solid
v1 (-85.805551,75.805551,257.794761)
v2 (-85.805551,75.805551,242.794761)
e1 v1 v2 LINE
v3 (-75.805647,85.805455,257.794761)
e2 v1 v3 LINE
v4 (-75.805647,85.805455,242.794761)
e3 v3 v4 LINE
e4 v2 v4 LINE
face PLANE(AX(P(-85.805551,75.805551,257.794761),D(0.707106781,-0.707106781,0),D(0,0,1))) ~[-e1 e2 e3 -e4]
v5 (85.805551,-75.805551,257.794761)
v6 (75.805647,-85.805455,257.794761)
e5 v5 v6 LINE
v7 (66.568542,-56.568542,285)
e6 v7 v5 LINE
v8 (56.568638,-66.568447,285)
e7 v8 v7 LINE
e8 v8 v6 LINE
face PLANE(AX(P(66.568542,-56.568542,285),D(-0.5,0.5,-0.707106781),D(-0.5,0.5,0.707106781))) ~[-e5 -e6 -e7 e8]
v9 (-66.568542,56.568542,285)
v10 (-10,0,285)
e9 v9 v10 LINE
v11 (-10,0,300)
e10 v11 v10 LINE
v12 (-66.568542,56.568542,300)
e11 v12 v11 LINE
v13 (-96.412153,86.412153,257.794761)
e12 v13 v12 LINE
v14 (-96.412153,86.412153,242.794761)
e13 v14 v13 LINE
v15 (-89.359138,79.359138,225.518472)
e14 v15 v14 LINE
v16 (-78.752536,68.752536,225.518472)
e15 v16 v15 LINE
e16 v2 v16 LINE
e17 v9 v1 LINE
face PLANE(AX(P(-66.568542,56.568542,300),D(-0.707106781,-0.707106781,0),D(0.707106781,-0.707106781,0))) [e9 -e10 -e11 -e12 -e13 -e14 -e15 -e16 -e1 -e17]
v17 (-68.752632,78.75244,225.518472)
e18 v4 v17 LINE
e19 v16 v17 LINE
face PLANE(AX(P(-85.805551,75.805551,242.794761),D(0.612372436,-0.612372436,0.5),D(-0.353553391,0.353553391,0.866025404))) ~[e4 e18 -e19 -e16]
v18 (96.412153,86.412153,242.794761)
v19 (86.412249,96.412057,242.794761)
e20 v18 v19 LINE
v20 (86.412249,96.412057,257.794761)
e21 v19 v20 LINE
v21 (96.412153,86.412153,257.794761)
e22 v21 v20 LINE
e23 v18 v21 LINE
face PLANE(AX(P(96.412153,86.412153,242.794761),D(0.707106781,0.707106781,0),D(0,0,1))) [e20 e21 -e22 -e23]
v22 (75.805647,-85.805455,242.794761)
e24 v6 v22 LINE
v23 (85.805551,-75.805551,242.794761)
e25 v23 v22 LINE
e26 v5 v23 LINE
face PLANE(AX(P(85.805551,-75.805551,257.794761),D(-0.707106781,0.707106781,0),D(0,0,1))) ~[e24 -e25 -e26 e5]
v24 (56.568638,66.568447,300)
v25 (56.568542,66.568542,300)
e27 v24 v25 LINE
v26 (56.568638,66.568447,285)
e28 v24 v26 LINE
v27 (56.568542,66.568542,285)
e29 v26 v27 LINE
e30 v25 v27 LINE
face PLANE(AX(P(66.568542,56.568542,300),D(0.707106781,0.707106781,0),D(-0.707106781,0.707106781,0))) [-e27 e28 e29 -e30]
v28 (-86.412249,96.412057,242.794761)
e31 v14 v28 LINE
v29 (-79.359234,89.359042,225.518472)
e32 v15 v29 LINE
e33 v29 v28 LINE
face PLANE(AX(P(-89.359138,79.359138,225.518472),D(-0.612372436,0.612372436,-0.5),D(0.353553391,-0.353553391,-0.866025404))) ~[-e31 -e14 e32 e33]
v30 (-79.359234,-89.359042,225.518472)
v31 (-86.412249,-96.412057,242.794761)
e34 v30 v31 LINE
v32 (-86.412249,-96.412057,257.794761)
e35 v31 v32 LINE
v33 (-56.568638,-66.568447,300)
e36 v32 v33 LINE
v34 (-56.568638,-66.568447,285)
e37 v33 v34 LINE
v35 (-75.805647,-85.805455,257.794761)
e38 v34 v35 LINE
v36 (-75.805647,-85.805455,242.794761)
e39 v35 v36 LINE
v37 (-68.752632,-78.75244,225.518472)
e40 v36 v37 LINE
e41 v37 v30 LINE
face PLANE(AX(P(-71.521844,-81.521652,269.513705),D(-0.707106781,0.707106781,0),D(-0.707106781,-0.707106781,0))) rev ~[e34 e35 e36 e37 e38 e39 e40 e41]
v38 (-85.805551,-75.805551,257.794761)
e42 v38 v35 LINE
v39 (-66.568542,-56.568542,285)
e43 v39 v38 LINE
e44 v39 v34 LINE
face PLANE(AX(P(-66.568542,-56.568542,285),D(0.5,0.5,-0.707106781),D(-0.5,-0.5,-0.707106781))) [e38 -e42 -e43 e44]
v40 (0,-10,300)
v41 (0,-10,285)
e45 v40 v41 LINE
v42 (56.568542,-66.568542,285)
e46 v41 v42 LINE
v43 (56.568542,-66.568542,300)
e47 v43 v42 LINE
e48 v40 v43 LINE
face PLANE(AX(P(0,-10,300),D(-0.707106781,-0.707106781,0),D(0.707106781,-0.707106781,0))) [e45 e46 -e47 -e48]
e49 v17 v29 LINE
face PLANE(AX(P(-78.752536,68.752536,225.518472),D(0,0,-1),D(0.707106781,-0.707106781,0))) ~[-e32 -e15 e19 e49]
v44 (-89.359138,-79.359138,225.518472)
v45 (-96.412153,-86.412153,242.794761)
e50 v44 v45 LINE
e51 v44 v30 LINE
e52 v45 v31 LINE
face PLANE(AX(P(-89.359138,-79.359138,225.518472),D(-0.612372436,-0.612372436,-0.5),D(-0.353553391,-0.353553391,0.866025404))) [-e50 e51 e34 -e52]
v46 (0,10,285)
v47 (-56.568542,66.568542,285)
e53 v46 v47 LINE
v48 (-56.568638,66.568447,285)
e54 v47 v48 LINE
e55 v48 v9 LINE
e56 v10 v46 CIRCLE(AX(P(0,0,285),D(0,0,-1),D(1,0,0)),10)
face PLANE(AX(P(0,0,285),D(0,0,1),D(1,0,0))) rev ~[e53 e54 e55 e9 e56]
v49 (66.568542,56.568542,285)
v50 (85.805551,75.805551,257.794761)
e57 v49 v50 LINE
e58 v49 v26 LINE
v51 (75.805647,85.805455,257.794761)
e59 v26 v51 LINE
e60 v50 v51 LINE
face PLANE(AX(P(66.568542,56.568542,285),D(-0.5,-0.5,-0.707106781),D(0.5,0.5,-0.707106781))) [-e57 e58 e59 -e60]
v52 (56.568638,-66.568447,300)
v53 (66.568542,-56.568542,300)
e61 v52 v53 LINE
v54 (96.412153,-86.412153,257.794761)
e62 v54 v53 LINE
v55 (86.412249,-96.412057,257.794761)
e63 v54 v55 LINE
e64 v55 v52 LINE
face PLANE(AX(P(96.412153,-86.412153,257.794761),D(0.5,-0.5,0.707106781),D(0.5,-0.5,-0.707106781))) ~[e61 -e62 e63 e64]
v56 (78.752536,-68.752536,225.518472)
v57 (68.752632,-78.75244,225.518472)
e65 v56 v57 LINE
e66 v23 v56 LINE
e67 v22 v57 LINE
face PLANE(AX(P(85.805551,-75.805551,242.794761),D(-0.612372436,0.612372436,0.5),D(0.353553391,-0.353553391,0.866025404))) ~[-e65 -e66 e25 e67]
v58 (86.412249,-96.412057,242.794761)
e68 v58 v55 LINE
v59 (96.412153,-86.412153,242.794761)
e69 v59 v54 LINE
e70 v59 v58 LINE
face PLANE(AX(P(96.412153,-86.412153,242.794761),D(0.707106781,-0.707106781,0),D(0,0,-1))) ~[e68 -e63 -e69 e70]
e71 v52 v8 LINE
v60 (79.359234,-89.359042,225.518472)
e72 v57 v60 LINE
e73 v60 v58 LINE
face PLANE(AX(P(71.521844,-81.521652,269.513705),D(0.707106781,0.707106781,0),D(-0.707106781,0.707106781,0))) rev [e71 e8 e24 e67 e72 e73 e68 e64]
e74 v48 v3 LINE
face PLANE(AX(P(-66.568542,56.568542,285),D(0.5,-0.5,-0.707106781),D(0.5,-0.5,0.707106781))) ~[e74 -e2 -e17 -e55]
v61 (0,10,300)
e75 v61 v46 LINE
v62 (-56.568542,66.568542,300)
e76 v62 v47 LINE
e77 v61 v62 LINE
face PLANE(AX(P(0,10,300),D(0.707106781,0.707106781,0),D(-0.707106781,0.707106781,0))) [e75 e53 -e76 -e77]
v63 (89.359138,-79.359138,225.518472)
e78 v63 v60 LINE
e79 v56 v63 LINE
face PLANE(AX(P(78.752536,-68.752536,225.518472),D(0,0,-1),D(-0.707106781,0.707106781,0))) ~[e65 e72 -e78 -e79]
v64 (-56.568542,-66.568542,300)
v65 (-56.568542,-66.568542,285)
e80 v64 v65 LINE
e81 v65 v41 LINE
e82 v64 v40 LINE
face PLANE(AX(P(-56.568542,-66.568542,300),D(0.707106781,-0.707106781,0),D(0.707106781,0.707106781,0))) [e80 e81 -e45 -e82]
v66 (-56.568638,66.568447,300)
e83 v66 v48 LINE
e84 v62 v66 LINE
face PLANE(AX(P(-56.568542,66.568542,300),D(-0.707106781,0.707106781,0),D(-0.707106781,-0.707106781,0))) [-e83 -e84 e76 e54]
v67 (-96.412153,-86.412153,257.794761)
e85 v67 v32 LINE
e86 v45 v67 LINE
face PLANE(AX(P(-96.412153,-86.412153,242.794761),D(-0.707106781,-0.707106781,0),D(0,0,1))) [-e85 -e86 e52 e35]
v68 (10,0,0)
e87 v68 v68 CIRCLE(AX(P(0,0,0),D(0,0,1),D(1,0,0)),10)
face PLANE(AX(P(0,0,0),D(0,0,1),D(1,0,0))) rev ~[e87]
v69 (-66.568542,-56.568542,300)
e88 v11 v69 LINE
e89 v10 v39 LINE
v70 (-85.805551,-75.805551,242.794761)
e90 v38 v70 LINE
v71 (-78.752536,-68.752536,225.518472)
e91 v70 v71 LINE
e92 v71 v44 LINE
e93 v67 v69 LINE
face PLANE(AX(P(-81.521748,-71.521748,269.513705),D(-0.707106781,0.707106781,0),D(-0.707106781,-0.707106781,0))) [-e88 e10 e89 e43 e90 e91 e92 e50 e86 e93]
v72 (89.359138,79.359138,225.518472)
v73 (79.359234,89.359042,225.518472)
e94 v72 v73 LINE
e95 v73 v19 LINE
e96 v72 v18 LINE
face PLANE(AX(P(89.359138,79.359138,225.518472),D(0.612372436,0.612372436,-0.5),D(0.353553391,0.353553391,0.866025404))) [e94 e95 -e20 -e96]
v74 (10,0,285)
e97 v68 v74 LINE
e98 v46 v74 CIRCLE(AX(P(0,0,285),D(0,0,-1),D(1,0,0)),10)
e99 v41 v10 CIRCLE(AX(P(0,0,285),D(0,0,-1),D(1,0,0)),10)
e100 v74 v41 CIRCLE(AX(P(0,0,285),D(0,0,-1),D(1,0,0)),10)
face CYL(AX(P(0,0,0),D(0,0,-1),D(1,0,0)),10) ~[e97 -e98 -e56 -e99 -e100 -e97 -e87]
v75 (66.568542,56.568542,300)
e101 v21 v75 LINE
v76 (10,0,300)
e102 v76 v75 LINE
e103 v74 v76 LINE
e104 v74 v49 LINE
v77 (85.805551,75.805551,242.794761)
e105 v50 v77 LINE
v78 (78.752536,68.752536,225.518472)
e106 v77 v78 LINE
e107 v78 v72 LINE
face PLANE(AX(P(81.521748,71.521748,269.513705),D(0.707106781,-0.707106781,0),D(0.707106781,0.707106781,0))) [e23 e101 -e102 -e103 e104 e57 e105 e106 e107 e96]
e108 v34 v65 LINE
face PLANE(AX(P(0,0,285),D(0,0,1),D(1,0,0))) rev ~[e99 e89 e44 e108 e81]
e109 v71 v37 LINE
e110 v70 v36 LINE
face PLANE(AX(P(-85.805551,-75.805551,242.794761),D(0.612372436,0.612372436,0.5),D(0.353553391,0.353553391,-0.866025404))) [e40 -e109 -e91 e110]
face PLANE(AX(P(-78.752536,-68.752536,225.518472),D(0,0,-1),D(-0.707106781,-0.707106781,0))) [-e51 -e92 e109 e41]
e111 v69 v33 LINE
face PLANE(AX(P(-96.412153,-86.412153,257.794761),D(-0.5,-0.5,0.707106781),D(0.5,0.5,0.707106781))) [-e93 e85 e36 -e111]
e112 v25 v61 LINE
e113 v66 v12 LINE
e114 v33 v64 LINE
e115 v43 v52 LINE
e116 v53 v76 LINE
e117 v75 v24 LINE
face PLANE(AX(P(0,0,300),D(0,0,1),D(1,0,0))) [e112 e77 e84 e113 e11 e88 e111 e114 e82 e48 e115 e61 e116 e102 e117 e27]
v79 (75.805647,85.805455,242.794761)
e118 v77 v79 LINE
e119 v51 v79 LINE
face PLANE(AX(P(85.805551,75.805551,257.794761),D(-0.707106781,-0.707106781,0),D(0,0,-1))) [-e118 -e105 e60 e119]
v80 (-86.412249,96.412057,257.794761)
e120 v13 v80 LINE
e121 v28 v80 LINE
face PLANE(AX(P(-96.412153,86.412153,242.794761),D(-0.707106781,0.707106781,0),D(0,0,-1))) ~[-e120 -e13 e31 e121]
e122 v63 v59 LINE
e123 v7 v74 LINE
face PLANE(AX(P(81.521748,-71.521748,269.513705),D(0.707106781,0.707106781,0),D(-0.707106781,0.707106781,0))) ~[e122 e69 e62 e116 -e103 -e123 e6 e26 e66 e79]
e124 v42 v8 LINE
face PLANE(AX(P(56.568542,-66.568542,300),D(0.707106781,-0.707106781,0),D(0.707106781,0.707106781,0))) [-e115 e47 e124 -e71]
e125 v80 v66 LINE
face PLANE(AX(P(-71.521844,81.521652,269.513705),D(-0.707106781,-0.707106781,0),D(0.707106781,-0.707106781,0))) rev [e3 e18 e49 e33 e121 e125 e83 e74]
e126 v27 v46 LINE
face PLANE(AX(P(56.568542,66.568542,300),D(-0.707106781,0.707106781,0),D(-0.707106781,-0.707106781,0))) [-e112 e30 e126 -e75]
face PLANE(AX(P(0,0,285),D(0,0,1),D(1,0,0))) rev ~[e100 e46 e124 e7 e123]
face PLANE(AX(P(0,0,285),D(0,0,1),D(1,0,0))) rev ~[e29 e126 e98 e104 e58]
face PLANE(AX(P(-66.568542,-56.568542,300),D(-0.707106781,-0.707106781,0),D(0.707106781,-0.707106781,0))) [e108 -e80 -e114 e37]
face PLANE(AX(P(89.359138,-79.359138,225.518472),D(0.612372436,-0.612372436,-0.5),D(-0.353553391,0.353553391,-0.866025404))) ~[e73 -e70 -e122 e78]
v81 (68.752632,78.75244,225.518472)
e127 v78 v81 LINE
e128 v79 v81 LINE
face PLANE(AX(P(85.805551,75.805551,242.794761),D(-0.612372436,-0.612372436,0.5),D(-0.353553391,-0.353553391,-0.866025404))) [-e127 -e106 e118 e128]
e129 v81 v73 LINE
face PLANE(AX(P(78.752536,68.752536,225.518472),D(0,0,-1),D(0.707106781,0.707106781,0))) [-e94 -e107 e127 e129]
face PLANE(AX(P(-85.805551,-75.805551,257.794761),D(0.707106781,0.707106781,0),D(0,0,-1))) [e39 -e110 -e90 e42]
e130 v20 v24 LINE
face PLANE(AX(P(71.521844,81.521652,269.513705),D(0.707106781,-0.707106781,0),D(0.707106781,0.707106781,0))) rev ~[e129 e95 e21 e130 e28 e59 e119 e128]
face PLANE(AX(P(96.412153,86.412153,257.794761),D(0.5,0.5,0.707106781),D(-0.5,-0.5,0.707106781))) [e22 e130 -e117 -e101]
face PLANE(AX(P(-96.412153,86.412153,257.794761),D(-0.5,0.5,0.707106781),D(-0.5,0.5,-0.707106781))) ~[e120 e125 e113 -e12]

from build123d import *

# Parameters (mm, degrees)
F0_R     = 10
F1_DEPTH = 300
F3_DEPTH = 15
F5_DEPTH = 14.142


# Not quite as in the source:
# - a feature of the source that left no trace in its solid (it failed there, or was rolled back) is left out


with BuildPart() as f1:
    # F0 (on Top) → F1 (new body)
    with BuildSketch(Plane.XY):
        Circle(F0_R)
    extrude(amount=F1_DEPTH)

    # F2 (on face) → F3 (join)
    with BuildSketch(Plane.XY.offset(300)):
        Polygon((10, 0), (10, 10), (0, 10), (-10, 10), (-10, 0), (-10, -10), (0, -10), (10, -10), align=None)
        Polygon((0, 10), (10, 10), (10, 0), (66.5685424949, 56.5685424949), (56.5685424949, 66.5685424949), align=None)
        Polygon((-10, 10), (0, 10), (-56.5685424949, 66.5685424949), (-66.5685424949, 56.5685424949), (-10, 0), align=None)
        Polygon((66.5685424949, -56.5685424949), (10, 0), (10, -10), (0, -10), (56.5685424949, -66.5685424949), align=None)
        Polygon((-10, -10), (-10, 0), (-66.5685424949, -56.5685424949), (-56.5685424949, -66.5685424949), (0, -10), align=None)
    extrude(amount=-F3_DEPTH)

    # F4 (on face) → F5 (join)
    with BuildSketch(Plane(origin=(5, -5, 0), x_dir=(0.7071067812, 0.7071067812, 0), z_dir=(0.7071067812, -0.7071067812, 0))):
        Polygon((129.2763065782, 257.7947612337), (87.0710678119, 300), (87.0710678119, 285), (114.2763065782, 257.7947612337), (114.2763065782, 242.7947612337), (129.2763065782, 242.7947612337), align=None)
        Polygon((119.3018365804, 225.5184724189), (129.2763065782, 242.7947612337), (114.2763065782, 242.7947612337), (104.3018365804, 225.5184724189), align=None)
    extrude(amount=-F5_DEPTH)

    # F6: F1 across plane


with BuildPart() as f1_1:
    add(f1.part)
    add(f1.part.mirror(Plane.XZ))

    # F7: F1 across plane


with BuildPart() as f1_2:
    add(f1_1.part)
    add(f1_1.part.mirror(Plane.YZ))


solid = f1_2.part
